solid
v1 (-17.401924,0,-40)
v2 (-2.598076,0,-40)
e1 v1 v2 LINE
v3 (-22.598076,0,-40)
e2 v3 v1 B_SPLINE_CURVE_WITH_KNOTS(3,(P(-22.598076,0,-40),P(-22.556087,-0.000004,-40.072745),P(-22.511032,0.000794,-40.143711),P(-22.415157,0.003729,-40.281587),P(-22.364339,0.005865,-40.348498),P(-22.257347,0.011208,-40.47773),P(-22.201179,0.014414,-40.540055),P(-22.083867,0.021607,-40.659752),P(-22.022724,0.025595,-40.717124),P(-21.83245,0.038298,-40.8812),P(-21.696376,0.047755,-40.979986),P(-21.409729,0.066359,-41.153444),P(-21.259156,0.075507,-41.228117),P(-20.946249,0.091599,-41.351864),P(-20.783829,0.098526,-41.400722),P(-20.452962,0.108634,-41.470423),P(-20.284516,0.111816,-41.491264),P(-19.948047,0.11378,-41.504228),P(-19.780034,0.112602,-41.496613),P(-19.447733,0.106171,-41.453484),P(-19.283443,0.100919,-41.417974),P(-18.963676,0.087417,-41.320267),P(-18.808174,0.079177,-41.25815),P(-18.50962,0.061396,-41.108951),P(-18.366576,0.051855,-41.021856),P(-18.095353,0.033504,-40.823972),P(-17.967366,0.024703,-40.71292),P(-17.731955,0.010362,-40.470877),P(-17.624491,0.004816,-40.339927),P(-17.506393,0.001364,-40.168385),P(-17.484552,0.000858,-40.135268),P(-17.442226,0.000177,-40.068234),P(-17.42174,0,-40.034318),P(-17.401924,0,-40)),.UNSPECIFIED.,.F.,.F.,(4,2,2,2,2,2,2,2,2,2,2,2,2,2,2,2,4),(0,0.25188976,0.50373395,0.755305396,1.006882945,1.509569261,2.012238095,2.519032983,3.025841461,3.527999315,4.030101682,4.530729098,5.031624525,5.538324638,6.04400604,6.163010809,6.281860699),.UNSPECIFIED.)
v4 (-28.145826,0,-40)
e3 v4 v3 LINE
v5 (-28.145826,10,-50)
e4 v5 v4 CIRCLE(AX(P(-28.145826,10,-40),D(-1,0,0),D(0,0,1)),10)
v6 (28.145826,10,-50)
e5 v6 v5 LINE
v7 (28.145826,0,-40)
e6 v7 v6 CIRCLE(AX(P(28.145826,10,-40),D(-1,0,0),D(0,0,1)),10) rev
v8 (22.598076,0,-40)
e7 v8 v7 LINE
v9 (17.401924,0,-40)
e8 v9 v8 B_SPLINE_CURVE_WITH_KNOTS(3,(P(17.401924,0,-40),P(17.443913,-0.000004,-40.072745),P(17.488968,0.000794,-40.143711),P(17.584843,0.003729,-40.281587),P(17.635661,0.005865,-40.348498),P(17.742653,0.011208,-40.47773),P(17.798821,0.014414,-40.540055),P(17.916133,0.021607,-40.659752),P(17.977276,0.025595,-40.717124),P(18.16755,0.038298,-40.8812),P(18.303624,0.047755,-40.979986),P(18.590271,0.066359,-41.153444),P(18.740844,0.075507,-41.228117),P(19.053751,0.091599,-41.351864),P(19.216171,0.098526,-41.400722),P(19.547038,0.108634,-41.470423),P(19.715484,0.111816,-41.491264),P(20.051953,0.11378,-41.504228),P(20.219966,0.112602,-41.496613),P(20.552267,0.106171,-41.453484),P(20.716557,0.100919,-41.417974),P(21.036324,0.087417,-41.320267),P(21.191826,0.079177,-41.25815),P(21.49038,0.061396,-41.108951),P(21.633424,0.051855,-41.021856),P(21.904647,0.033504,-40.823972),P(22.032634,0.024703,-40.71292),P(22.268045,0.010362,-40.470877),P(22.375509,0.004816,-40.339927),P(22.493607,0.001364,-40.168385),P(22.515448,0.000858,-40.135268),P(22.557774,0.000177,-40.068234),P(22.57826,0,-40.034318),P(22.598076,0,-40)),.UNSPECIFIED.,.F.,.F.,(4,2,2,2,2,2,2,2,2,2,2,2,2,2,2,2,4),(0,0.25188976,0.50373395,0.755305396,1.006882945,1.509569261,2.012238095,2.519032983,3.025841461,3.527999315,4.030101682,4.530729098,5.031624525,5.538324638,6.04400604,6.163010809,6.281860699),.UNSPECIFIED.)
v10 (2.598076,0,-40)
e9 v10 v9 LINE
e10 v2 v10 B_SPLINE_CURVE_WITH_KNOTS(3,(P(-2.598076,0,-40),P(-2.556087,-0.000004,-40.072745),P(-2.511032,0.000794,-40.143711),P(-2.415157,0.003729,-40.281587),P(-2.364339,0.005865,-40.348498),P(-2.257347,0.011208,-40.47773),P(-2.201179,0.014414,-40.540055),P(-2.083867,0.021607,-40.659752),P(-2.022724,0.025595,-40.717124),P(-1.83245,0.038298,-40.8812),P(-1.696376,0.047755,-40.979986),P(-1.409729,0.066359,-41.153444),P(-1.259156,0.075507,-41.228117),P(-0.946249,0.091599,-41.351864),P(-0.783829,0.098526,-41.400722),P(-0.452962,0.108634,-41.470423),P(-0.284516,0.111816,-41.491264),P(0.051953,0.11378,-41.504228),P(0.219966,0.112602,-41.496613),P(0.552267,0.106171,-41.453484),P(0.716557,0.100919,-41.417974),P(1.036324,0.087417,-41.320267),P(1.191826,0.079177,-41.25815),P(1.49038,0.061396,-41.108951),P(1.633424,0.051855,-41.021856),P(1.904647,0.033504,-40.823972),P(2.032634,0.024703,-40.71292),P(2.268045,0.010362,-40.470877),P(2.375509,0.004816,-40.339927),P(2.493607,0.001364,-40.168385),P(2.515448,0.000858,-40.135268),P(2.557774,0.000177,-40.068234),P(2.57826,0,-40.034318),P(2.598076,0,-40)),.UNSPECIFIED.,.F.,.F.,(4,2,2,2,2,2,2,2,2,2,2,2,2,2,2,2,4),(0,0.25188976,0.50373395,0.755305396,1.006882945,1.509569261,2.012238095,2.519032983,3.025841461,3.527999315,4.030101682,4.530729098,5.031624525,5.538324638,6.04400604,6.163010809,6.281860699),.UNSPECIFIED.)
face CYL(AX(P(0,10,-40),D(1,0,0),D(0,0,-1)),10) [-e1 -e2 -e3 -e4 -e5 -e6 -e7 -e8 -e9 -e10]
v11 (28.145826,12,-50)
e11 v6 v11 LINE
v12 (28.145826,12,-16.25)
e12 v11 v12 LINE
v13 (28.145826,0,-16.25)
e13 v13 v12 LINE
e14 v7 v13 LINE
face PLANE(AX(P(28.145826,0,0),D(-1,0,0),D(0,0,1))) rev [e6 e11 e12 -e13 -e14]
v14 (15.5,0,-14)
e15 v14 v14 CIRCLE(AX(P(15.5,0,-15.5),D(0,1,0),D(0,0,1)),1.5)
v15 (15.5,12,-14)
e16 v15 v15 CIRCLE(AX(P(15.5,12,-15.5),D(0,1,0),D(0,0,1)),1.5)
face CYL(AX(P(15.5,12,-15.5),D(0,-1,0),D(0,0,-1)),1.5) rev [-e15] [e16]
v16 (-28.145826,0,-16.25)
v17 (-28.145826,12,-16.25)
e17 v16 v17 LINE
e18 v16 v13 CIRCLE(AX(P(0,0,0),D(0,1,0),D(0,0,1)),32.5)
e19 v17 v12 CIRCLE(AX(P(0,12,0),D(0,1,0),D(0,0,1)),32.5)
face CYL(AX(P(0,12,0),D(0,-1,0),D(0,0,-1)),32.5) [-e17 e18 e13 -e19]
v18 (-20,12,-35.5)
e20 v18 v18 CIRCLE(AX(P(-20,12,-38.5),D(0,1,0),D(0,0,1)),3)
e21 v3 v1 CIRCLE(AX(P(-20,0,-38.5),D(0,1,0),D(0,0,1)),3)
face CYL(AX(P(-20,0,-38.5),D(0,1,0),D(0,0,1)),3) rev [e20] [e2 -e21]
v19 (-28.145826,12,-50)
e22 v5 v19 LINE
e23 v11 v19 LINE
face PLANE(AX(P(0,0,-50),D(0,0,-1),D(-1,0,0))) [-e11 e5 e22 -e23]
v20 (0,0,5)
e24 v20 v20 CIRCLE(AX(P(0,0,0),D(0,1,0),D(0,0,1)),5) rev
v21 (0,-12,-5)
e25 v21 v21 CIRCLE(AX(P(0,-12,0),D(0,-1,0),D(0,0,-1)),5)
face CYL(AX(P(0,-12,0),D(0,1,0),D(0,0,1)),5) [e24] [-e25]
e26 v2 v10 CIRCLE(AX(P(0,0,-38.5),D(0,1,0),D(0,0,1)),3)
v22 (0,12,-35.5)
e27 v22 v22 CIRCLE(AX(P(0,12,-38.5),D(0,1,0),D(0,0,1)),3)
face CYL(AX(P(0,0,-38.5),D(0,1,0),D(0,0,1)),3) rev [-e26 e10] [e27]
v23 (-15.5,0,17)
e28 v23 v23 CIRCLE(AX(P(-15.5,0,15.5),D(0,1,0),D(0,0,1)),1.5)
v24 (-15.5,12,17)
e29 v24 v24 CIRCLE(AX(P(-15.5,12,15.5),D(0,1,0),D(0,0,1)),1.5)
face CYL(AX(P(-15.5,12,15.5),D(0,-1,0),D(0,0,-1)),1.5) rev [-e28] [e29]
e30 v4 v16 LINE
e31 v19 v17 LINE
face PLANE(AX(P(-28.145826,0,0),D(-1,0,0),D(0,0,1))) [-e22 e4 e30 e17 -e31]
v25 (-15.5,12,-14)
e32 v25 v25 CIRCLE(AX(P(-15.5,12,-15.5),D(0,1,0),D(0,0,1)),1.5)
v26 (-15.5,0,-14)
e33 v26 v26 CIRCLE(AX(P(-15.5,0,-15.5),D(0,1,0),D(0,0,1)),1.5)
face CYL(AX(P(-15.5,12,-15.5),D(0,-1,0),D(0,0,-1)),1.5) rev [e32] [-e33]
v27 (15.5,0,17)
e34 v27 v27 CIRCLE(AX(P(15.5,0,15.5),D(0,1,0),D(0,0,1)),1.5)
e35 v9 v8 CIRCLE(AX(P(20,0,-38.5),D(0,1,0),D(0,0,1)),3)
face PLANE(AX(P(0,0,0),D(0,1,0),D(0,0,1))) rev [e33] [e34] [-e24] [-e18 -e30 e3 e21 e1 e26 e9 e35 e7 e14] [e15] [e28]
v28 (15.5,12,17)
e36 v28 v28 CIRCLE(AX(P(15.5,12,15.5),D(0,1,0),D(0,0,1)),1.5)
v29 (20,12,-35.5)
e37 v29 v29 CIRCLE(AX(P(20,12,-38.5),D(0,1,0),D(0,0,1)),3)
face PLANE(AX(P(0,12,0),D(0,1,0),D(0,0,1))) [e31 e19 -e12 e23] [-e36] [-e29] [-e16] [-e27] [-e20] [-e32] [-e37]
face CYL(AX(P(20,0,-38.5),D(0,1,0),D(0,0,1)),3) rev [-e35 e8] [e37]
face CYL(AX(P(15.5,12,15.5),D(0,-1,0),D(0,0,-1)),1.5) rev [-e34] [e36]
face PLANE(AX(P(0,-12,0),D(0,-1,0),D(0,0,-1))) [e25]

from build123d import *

# Parameters (mm, degrees)
SKETCH_1_R          = 32.5
SKETCH_1_R_2        = 1.5
EXTRUDE_2_DEPTH     = 12
SKETCH_2_R          = 5
EXTRUDE_3_DEPTH     = 12
EXTRUDE_START       = -12
EXTRUDE_4_DEPTH     = 12
SKETCH_4_R          = 3
CUT_EXTRUDE_1_DEPTH = 12
FILLET_2_R          = 10


with BuildPart() as part:
    # 草图1 → 凸台-拉伸2 (new body)
    with BuildSketch(Plane(origin=(0, 0, 0), x_dir=(1, 0, 0), z_dir=(0, 1, 0))):
        with Locations(Location((0, 0, 0), (0, 0, 270))):
            Circle(SKETCH_1_R)
        with Locations(Location((-15.5, 15.5, 0), (0, 0, 270))):
            Circle(SKETCH_1_R_2, mode=Mode.SUBTRACT)
        with Locations(Location((15.5, 15.5, 0), (0, 0, 270))):
            Circle(SKETCH_1_R_2, mode=Mode.SUBTRACT)
        with Locations(Location((15.5, -15.5, 0), (0, 0, 270))):
            Circle(SKETCH_1_R_2, mode=Mode.SUBTRACT)
        with Locations(Location((-15.5, -15.5, 0), (0, 0, 270))):
            Circle(SKETCH_1_R_2, mode=Mode.SUBTRACT)
    extrude(amount=EXTRUDE_2_DEPTH)

    # 草图2 → 凸台-拉伸3 (add)
    with BuildSketch(Plane.XZ):
        with Locations(Location((0, 0, 0), (0, 0, 90))):
            Circle(SKETCH_2_R)
    extrude(amount=EXTRUDE_3_DEPTH)

    # 草图3 → 凸台-拉伸4 (add)
    with BuildSketch(Plane(origin=(0, 12, 0), x_dir=(1, 0, 0), z_dir=(0, 1, 0)).offset(EXTRUDE_START)):
        with BuildLine():
            Line((-28.145825623, 50), (-28.145825623, 16.25))
            ThreePointArc((-28.145825623, 16.25), (-16.25, 28.145825623), (0, 32.5))
            Line((0, 32.5), (0, 50))
            Line((0, 50), (-28.145825623, 50))
        make_face()
        with BuildLine():
            ThreePointArc((0, 32.5), (16.25, 28.145825623), (28.145825623, 16.25))
            Line((28.145825623, 16.25), (28.145825623, 50))
            Line((28.145825623, 50), (0, 50))
            Line((0, 50), (0, 32.5))
        make_face()
    extrude(amount=EXTRUDE_4_DEPTH)

    # 草图4 → 切除-拉伸1 (cut)
    with BuildSketch(Plane(origin=(0, 12, 0), x_dir=(1, 0, 0), z_dir=(0, 1, 0))):
        with Locations(Location((0, 38.5, 0), (0, 0, 270))):
            Circle(SKETCH_4_R)
        with Locations(Location((20, 38.5, 0), (0, 0, 270))):
            Circle(SKETCH_4_R)
        with Locations(Location((-20, 38.5, 0), (0, 0, 270))):
            Circle(SKETCH_4_R)
    extrude(amount=-CUT_EXTRUDE_1_DEPTH, mode=Mode.SUBTRACT)

    # 圆角2
    # the kernel refuses this fillet: 10 mm, written as the material it takes off along each edge
    with BuildSketch(Plane(origin=(53.145825623, 0, -50), x_dir=(0, 0, 1), z_dir=(-1, 0, 0))) as fillet_2_piece_1:
        with BuildLine():
            CenterArc((FILLET_2_R, FILLET_2_R), FILLET_2_R, 180, 90)
            Line((0, FILLET_2_R), (0, 0))
            Line((0, 0), (FILLET_2_R, 0))
        make_face()
    extrude(amount=106.291651246, mode=Mode.SUBTRACT)


solid = part.part
